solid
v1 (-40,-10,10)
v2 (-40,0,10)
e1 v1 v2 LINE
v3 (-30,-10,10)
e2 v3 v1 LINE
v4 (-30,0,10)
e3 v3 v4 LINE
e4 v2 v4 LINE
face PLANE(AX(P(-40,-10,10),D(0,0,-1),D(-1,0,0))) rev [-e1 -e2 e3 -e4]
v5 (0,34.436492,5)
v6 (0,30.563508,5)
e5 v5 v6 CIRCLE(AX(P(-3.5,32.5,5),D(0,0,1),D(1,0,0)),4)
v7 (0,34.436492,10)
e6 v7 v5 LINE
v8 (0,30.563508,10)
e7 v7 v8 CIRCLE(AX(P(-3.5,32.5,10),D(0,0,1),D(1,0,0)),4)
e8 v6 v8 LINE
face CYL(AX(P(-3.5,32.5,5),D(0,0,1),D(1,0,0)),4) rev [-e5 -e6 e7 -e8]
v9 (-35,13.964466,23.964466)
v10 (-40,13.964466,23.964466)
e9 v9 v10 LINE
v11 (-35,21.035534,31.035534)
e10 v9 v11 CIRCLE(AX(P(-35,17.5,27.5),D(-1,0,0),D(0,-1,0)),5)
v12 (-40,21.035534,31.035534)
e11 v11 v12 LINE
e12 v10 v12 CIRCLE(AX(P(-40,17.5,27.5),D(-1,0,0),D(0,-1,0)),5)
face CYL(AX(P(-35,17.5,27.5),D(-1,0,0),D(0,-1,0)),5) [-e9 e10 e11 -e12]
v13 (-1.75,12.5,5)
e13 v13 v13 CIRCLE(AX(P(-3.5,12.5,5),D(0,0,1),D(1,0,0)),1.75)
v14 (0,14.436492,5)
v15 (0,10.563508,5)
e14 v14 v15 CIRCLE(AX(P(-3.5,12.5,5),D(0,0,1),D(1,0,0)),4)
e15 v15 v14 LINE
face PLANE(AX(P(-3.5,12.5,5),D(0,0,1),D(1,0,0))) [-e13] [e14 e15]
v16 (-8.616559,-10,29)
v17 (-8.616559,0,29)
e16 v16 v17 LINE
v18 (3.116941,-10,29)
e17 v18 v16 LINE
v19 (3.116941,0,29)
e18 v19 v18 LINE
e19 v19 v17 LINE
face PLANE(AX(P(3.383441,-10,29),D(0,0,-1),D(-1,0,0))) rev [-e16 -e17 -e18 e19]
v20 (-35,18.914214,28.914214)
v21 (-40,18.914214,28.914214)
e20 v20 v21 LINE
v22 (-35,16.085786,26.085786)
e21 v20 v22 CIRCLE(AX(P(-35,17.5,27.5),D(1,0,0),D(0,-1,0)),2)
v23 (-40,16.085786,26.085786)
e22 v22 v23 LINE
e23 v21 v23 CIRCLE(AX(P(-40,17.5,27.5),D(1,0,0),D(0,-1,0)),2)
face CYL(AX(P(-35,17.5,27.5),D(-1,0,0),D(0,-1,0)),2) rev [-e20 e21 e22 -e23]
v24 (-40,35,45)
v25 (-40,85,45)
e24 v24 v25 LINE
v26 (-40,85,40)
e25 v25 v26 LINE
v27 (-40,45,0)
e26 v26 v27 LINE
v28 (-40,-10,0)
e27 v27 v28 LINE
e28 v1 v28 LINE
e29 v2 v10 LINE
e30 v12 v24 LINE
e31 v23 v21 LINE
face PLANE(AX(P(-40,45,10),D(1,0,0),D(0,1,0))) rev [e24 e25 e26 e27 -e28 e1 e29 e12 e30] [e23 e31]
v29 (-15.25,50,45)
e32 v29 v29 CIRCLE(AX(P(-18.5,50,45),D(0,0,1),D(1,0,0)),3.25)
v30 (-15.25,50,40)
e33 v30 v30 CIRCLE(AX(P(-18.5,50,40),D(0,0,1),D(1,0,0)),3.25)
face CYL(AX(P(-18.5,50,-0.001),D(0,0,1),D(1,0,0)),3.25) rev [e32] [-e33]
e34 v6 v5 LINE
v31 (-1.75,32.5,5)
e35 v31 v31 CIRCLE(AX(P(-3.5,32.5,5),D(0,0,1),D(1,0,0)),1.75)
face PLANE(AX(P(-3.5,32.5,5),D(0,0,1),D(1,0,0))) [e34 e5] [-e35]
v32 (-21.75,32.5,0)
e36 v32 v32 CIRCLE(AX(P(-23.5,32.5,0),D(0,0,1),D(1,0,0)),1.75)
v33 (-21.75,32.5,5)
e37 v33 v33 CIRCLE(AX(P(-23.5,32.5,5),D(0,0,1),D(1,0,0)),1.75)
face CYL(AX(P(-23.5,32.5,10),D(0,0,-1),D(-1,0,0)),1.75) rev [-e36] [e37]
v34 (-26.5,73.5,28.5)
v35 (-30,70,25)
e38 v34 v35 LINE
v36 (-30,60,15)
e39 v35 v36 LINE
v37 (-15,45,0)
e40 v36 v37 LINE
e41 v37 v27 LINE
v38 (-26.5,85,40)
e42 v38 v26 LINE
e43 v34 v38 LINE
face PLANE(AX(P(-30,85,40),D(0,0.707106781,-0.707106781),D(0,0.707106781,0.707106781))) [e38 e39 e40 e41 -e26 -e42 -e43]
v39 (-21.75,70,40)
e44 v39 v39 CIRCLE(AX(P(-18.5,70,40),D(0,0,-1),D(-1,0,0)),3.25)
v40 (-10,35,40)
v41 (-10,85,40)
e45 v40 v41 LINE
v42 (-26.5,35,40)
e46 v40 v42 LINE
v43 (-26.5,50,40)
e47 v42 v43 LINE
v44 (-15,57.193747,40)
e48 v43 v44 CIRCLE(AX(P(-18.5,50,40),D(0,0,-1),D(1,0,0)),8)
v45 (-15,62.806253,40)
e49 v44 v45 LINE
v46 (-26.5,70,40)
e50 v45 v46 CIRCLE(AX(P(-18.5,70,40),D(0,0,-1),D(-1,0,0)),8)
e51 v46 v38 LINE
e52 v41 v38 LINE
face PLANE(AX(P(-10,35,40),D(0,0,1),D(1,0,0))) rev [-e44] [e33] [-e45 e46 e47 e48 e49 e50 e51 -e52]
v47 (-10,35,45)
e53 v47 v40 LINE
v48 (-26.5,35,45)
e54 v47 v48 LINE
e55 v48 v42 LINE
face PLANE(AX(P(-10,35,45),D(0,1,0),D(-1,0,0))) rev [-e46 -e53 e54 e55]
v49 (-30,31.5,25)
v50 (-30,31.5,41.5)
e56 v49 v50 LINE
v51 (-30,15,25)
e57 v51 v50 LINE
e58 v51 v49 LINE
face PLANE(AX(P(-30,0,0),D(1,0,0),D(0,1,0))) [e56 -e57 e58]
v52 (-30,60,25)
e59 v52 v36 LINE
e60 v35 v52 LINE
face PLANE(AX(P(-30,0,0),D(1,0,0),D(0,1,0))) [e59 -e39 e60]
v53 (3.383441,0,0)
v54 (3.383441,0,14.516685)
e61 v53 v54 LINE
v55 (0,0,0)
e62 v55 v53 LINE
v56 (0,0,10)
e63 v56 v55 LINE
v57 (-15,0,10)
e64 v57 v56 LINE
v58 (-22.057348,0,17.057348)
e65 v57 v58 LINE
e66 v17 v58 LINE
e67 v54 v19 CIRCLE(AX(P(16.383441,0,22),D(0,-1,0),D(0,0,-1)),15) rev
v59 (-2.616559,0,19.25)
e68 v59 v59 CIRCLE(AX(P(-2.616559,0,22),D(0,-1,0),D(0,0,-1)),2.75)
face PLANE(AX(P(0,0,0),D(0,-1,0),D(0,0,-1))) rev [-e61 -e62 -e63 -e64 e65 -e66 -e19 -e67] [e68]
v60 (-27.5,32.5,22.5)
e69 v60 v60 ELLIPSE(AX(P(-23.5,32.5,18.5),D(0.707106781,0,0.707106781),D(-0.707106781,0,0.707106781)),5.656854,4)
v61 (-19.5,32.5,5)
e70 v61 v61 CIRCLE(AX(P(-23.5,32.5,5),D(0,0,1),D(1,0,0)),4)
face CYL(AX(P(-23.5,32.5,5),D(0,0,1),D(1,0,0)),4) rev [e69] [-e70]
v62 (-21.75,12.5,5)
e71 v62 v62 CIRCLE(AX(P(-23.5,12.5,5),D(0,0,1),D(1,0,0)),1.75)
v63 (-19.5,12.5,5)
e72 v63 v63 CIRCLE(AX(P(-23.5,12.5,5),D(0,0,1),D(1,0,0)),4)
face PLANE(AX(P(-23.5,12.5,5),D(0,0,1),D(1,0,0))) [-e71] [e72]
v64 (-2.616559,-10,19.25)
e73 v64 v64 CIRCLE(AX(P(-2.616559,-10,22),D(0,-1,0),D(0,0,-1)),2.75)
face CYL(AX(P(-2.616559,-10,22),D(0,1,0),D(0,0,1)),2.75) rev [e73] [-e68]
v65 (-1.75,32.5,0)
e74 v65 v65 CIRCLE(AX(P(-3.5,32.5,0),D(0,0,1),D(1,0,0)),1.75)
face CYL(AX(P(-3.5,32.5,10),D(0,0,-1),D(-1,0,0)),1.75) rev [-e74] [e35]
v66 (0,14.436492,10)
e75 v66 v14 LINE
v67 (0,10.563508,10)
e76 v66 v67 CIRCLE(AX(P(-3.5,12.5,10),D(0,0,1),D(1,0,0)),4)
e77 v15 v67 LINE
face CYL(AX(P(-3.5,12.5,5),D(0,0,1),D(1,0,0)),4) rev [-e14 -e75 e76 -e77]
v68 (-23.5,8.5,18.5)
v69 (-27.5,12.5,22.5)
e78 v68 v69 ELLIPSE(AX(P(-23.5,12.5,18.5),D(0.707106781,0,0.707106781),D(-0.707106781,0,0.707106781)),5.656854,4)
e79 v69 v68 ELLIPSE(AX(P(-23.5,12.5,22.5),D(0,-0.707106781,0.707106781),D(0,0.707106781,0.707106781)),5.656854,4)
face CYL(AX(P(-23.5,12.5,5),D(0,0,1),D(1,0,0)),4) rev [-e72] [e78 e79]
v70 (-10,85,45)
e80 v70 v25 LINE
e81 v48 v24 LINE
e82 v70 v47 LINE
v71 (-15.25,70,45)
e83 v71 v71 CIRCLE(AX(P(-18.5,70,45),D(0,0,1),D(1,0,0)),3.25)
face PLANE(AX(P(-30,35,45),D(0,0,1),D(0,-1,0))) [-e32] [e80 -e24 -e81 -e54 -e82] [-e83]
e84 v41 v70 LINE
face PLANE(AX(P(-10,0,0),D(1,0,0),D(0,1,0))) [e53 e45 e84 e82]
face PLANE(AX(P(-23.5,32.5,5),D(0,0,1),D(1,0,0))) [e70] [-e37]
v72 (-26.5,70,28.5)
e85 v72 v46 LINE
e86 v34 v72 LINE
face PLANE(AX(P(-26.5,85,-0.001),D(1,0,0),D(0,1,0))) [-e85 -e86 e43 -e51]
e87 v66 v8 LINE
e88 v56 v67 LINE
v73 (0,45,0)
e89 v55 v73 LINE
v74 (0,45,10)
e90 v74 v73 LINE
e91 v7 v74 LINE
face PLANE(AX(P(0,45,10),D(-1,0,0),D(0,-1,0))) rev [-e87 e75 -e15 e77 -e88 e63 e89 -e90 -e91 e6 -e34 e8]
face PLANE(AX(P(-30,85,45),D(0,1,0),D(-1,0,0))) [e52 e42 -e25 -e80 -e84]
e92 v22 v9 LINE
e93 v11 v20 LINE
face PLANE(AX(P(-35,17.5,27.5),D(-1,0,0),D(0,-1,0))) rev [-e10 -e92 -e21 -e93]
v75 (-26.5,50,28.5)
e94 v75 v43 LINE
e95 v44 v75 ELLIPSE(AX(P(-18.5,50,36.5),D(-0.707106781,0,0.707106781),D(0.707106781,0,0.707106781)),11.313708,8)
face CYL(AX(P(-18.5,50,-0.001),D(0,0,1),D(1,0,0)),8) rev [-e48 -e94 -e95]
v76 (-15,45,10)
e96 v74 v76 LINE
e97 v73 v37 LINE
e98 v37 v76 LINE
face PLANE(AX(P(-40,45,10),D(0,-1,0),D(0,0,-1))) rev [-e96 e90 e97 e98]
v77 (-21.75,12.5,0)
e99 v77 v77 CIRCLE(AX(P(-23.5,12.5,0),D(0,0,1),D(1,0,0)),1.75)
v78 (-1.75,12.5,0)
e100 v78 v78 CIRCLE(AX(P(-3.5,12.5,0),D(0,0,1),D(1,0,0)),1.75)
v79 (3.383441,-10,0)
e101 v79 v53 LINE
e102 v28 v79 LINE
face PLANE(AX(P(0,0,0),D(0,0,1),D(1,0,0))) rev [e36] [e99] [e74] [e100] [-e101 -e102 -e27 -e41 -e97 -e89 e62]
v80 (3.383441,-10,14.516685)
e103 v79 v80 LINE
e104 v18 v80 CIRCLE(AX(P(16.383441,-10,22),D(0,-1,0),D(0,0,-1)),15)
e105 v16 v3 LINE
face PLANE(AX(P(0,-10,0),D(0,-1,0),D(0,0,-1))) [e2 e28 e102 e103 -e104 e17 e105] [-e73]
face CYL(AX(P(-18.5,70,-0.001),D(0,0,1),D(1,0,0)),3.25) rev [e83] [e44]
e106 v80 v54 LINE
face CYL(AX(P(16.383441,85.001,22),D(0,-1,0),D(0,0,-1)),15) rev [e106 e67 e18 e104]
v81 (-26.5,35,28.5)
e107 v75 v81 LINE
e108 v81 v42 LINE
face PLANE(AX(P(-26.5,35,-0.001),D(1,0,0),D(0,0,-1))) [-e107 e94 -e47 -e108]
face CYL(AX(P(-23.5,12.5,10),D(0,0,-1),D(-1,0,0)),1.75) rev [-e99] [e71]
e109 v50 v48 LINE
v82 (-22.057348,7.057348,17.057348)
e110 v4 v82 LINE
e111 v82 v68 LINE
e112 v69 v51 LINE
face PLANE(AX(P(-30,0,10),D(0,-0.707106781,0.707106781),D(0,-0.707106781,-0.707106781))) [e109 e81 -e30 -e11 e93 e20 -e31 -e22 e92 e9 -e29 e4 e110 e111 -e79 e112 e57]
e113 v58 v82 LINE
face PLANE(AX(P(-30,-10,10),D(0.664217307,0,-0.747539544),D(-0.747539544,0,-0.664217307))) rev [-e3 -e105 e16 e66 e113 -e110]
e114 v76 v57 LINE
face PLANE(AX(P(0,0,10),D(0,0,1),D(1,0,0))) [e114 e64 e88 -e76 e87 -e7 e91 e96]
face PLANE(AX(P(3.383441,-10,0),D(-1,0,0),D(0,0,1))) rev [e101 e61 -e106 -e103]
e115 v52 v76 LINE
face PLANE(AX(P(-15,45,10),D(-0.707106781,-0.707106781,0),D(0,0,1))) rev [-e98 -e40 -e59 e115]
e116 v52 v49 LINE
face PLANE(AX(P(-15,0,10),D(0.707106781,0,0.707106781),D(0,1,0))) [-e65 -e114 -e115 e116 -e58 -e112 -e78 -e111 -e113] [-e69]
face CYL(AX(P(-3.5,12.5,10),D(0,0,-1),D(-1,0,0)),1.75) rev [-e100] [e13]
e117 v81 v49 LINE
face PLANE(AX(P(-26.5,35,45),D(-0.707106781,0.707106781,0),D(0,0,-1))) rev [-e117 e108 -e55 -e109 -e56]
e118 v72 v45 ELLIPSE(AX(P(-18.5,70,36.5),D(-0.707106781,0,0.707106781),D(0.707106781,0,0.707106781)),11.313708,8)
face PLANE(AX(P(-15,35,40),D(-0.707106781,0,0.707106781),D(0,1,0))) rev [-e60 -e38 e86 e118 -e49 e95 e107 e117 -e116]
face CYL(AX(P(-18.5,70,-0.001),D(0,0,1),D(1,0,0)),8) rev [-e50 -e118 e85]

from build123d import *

# Parameters (mm, degrees)
ESQUISSE1_W             = 40
ESQUISSE1_H             = 45
ESQUISSE1_R             = 1.75
BOSS_EXTRU_1_DEPTH      = 10
ESQUISSE2_R             = 4
ENL_V_MAT_EXTRU_2_DEPTH = 5
BOSS_EXTRU_2_DEPTH      = 10
ESQUISSE4_W             = 5
ESQUISSE4_H             = 50
BOSS_EXTRU_3_DEPTH      = 20
ENL_V_MAT_EXTRU_3_REACH = 106.163
ESQUISSE5_R             = 3.25
ESQUISSE8_R             = 2.75
BOSS_EXTRU_8_DEPTH      = 10
ENL_V_MAT_EXTRU_5_REACH = 114.472
ESQUISSE9_R             = 15
CHANFREIN2_SIZE         = 15
ENL_V_MAT_EXTRU_4_REACH = 104.103
CHANFREIN3_SIZE         = 3.5
BOSS_EXTRU_4_DEPTH      = 5


# Some blends are built 0.0001 mm under size
with BuildPart() as part:
    # Esquisse1 → Boss.-Extru.1 (new body)
    with BuildSketch(Plane.XY):
        with Locations((-20, 22.5)):
            Rectangle(ESQUISSE1_W, ESQUISSE1_H)
        with Locations((-3.5, 32.5)):
            Circle(ESQUISSE1_R, mode=Mode.SUBTRACT)
        with Locations((-23.5, 32.5)):
            Circle(ESQUISSE1_R, mode=Mode.SUBTRACT)
        with Locations((-23.5, 12.5)):
            Circle(ESQUISSE1_R, mode=Mode.SUBTRACT)
        with Locations((-3.5, 12.5)):
            Circle(ESQUISSE1_R, mode=Mode.SUBTRACT)
    extrude(amount=BOSS_EXTRU_1_DEPTH)

    # Esquisse2 → Enlèv. mat.-Extru.2 (cut)
    with BuildSketch(Plane.XY.offset(10)):
        with Locations((-23.5, 32.5)):
            Circle(ESQUISSE2_R)
        with Locations((-3.5, 32.5)):
            Circle(ESQUISSE2_R)
        with Locations((-23.5, 12.5)):
            Circle(ESQUISSE2_R)
        with Locations((-3.5, 12.5)):
            Circle(ESQUISSE2_R)
    extrude(amount=-ENL_V_MAT_EXTRU_2_DEPTH, mode=Mode.SUBTRACT)

    # Esquisse3 → Boss.-Extru.2 (add)
    with BuildSketch(Plane.ZY.offset(40)):
        Polygon((10, 0), (45, 35), (45, 85), (40, 85), (0, 45), (10, 45), align=None)
    extrude(amount=-BOSS_EXTRU_2_DEPTH)

    # Esquisse4 → Boss.-Extru.3 (add)
    with BuildSketch(Plane(origin=(-30, 0, 0), x_dir=(0, 0, -1), z_dir=(1, 0, 0))):
        with Locations((-42.5, 60)):
            Rectangle(ESQUISSE4_W, ESQUISSE4_H)
    extrude(amount=BOSS_EXTRU_3_DEPTH)

    # Esquisse5 → Enlèv. mat.-Extru.3 (cut, up to next)
    with BuildSketch(Plane.XY.offset(45), mode=Mode.PRIVATE) as enl_v_mat_extru_3_sk1:
        with Locations((-18.5, 70)):
            Circle(ESQUISSE5_R)
    enl_v_mat_extru_3_tool1 = extrude(enl_v_mat_extru_3_sk1.sketch, amount=-ENL_V_MAT_EXTRU_3_REACH, mode=Mode.PRIVATE) & part.part
    # Esquisse5 → Enlèv. mat.-Extru.3 (cut, up to next)
    with BuildSketch(Plane.XY.offset(45), mode=Mode.PRIVATE) as enl_v_mat_extru_3_sk2:
        with Locations((-18.5, 50)):
            Circle(ESQUISSE5_R)
    enl_v_mat_extru_3_tool2 = extrude(enl_v_mat_extru_3_sk2.sketch, amount=-ENL_V_MAT_EXTRU_3_REACH, mode=Mode.PRIVATE) & part.part
    add(enl_v_mat_extru_3_tool1.solids().sort_by_distance((-18.5, 70, 45))[0], mode=Mode.SUBTRACT)
    add(enl_v_mat_extru_3_tool2.solids().sort_by_distance((-18.5, 50, 45))[0], mode=Mode.SUBTRACT)

    # Esquisse8 → Boss.-Extru.8 (add)
    with BuildSketch(Plane.XZ):
        Polygon((3.3834406, 0), (-40, 0), (-40, 10), (-30, 10), (-8.6165594, 29), (3.3834406, 29), align=None)
        with Locations(Location((-2.6165594, 22, 0), (0, 0, 270))):
            Circle(ESQUISSE8_R, mode=Mode.SUBTRACT)
    extrude(amount=BOSS_EXTRU_8_DEPTH)

    # Esquisse9 → Enlèv. mat.-Extru.5 (cut, up to next)
    with BuildSketch(Plane.XZ.offset(10), mode=Mode.PRIVATE) as enl_v_mat_extru_5_sk1:
        with Locations((16.3834406, 22)):
            Circle(ESQUISSE9_R)
    enl_v_mat_extru_5_tool1 = extrude(enl_v_mat_extru_5_sk1.sketch, amount=-ENL_V_MAT_EXTRU_5_REACH, mode=Mode.PRIVATE) & part.part
    add(enl_v_mat_extru_5_tool1.solids().sort_by_distance((16.383441, -10, 22))[0], mode=Mode.SUBTRACT)

    # Chanfrein2
    # the kernel refuses this chamfer: 15 mm, written as the material it adds along each edge
    with BuildSketch(Plane(origin=(-30, 83.575244819, 10), x_dir=(1, 0, 0), z_dir=(0, -1, 0))) as chanfrein2_piece_1_section:
        Polygon((CHANFREIN2_SIZE, 0), (0, CHANFREIN2_SIZE), (0, 0), align=None)
    chanfrein2_piece_1 = extrude(amount=122.150489639, mode=Mode.PRIVATE)
    chanfrein2_piece_1 = split(chanfrein2_piece_1, bisect_by=Plane(origin=(-30, 69.28762241, 24.28762241), z_dir=(0, -0.707106781186543, 0.7071067811865521)), keep=Keep.TOP, mode=Mode.PRIVATE)
    chanfrein2_piece_1 = chanfrein2_piece_1 - Plane(origin=(-23.5, 12.5, 10), x_dir=(1, 0, 0), z_dir=(0, 0, 1)) * Cylinder(4, 305, mode=Mode.PRIVATE)
    chanfrein2_piece_1 = chanfrein2_piece_1 - Plane(origin=(-23.5, 32.5, 10), x_dir=(1, 0, 0), z_dir=(0, 0, 1)) * Cylinder(4, 305, mode=Mode.PRIVATE)
    chanfrein2_piece_1 = split(chanfrein2_piece_1, bisect_by=Plane(origin=(-30, 41.78762241, 51.78762241), z_dir=(0, 0.7071067811865328, -0.7071067811865622)), keep=Keep.TOP, mode=Mode.PRIVATE)
    chanfrein2_piece_1 = split(chanfrein2_piece_1, bisect_by=Plane(origin=(-41.78762241, 71.78762241, 10), z_dir=(-0.7071067811865475, -0.7071067811865477, 0)), keep=Keep.TOP, mode=Mode.PRIVATE)
    add(chanfrein2_piece_1)
    with BuildSketch(Plane(origin=(-30, 83.575244819, 10), x_dir=(1, 0, 0), z_dir=(0, -1, 0))) as chanfrein2_piece_2_section:
        Polygon((CHANFREIN2_SIZE, 0), (0, CHANFREIN2_SIZE), (0, 0), align=None)
    chanfrein2_piece_2 = extrude(amount=122.150489639, mode=Mode.PRIVATE)
    chanfrein2_piece_2 = split(chanfrein2_piece_2, bisect_by=Plane(origin=(-30, -10, 10), z_dir=(0, 1, 0)), keep=Keep.TOP, mode=Mode.PRIVATE)
    chanfrein2_piece_2 = split(chanfrein2_piece_2, bisect_by=Plane(origin=(-30, 41.78762241, 51.78762241), z_dir=(0, -0.7071067811865328, 0.7071067811865622)), keep=Keep.TOP, mode=Mode.PRIVATE)
    chanfrein2_piece_2 = split(chanfrein2_piece_2, bisect_by=Plane(origin=(-30, 83.575244819, 10), z_dir=(0.66421730691086, 0, -0.7475395435694919)), keep=Keep.TOP, mode=Mode.PRIVATE)
    add(chanfrein2_piece_2)
    with BuildSketch(Plane(origin=(-30, 45, -38.575244819), x_dir=(1, 0, 0), z_dir=(0, 0, 1))) as chanfrein2_piece_3_section:
        Polygon((CHANFREIN2_SIZE, 0), (0, CHANFREIN2_SIZE), (0, 0), align=None)
    chanfrein2_piece_3 = extrude(amount=87.150489639, mode=Mode.PRIVATE)
    chanfrein2_piece_3 = split(chanfrein2_piece_3, bisect_by=Plane(origin=(-30, 25.71237759, -19.28762241), z_dir=(0, -0.707106781186543, 0.7071067811865521)), keep=Keep.TOP, mode=Mode.PRIVATE)
    chanfrein2_piece_3 = split(chanfrein2_piece_3, bisect_by=Plane(origin=(1.78762241, 45, -6.78762241), z_dir=(-0.7071067811865476, 0, -0.7071067811865476)), keep=Keep.TOP, mode=Mode.PRIVATE)
    add(chanfrein2_piece_3)
    with BuildSketch(Plane(origin=(-30, 35, 40), x_dir=(0, 0, -1), z_dir=(0, 1, 0))) as chanfrein2_piece_4_section:
        Polygon((CHANFREIN2_SIZE, 0), (0, -CHANFREIN2_SIZE), (0, 0), align=None)
    chanfrein2_piece_4 = extrude(amount=88.575244819, mode=Mode.PRIVATE)
    chanfrein2_piece_4 = split(chanfrein2_piece_4, bisect_by=Plane(origin=(-30, 60, 15), z_dir=(0, -0.707106781186543, 0.7071067811865521)), keep=Keep.TOP, mode=Mode.PRIVATE)
    chanfrein2_piece_4 = chanfrein2_piece_4 - Plane(origin=(-18.5, 70, 40), x_dir=(1, 0, 0), z_dir=(0, 0, 1)) * Cylinder(3.25, 238, mode=Mode.PRIVATE)
    chanfrein2_piece_4 = chanfrein2_piece_4 - Plane(origin=(-18.5, 50, 40), x_dir=(1, 0, 0), z_dir=(0, 0, 1)) * Cylinder(3.25, 238, mode=Mode.PRIVATE)
    add(chanfrein2_piece_4)

    # Esquisse6 → Enlèv. mat.-Extru.4 (cut, up to next)
    with BuildSketch(Plane(origin=(0, 0, 40), x_dir=(-1, 0, 0), z_dir=(0, 0, -1)), mode=Mode.PRIVATE) as enl_v_mat_extru_4_sk1:
        with BuildLine():
            Line((10.5, 70), (10.5, 85))
            Line((10.5, 85), (26.5, 85))
            Line((26.5, 85), (26.5, 70))
            ThreePointArc((26.5, 70), (18.5, 62), (10.5, 70))
        make_face()
    enl_v_mat_extru_4_tool1 = extrude(enl_v_mat_extru_4_sk1.sketch, amount=ENL_V_MAT_EXTRU_4_REACH, mode=Mode.PRIVATE) & part.part
    # Esquisse6 → Enlèv. mat.-Extru.4 (cut, up to next)
    with BuildSketch(Plane(origin=(0, 0, 40), x_dir=(-1, 0, 0), z_dir=(0, 0, -1)), mode=Mode.PRIVATE) as enl_v_mat_extru_4_sk2:
        with BuildLine():
            Line((10.5, 50), (10.5, 35))
            Line((10.5, 35), (26.5, 35))
            Line((26.5, 35), (26.5, 50))
            ThreePointArc((26.5, 50), (18.5, 58), (10.5, 50))
        make_face()
    enl_v_mat_extru_4_tool2 = extrude(enl_v_mat_extru_4_sk2.sketch, amount=ENL_V_MAT_EXTRU_4_REACH, mode=Mode.PRIVATE) & part.part
    add(enl_v_mat_extru_4_tool1.solids().sort_by_distance((-18.5, 74.283507, 40))[0], mode=Mode.SUBTRACT)
    add(enl_v_mat_extru_4_tool2.solids().sort_by_distance((-18.5, 45.716493, 40))[0], mode=Mode.SUBTRACT)

    # Chanfrein3
    chanfrein3_edges = [part.edges().sort_by_distance(p)[0] for p in [
        (-30, 35, 35),
    ]]
    chamfer(chanfrein3_edges, length=CHANFREIN3_SIZE - 0.0001)  # a hair under: the kernel refuses the full size

    # Esquisse7 → Boss.-Extru.4 (add)
    with BuildSketch(Plane.ZY.offset(40)):
        with BuildLine():
            Line((28.914213562, 18.914213562), (31.035533906, 21.035533906))
            ThreePointArc((31.035533906, 21.035533906), (31.035533906, 13.964466094), (23.964466094, 13.964466094))
            Line((23.964466094, 13.964466094), (26.085786438, 16.085786438))
            ThreePointArc((26.085786438, 16.085786438), (28.914213562, 16.085786438), (28.914213562, 18.914213562))
        make_face()
    extrude(amount=-BOSS_EXTRU_4_DEPTH)


solid = part.part
